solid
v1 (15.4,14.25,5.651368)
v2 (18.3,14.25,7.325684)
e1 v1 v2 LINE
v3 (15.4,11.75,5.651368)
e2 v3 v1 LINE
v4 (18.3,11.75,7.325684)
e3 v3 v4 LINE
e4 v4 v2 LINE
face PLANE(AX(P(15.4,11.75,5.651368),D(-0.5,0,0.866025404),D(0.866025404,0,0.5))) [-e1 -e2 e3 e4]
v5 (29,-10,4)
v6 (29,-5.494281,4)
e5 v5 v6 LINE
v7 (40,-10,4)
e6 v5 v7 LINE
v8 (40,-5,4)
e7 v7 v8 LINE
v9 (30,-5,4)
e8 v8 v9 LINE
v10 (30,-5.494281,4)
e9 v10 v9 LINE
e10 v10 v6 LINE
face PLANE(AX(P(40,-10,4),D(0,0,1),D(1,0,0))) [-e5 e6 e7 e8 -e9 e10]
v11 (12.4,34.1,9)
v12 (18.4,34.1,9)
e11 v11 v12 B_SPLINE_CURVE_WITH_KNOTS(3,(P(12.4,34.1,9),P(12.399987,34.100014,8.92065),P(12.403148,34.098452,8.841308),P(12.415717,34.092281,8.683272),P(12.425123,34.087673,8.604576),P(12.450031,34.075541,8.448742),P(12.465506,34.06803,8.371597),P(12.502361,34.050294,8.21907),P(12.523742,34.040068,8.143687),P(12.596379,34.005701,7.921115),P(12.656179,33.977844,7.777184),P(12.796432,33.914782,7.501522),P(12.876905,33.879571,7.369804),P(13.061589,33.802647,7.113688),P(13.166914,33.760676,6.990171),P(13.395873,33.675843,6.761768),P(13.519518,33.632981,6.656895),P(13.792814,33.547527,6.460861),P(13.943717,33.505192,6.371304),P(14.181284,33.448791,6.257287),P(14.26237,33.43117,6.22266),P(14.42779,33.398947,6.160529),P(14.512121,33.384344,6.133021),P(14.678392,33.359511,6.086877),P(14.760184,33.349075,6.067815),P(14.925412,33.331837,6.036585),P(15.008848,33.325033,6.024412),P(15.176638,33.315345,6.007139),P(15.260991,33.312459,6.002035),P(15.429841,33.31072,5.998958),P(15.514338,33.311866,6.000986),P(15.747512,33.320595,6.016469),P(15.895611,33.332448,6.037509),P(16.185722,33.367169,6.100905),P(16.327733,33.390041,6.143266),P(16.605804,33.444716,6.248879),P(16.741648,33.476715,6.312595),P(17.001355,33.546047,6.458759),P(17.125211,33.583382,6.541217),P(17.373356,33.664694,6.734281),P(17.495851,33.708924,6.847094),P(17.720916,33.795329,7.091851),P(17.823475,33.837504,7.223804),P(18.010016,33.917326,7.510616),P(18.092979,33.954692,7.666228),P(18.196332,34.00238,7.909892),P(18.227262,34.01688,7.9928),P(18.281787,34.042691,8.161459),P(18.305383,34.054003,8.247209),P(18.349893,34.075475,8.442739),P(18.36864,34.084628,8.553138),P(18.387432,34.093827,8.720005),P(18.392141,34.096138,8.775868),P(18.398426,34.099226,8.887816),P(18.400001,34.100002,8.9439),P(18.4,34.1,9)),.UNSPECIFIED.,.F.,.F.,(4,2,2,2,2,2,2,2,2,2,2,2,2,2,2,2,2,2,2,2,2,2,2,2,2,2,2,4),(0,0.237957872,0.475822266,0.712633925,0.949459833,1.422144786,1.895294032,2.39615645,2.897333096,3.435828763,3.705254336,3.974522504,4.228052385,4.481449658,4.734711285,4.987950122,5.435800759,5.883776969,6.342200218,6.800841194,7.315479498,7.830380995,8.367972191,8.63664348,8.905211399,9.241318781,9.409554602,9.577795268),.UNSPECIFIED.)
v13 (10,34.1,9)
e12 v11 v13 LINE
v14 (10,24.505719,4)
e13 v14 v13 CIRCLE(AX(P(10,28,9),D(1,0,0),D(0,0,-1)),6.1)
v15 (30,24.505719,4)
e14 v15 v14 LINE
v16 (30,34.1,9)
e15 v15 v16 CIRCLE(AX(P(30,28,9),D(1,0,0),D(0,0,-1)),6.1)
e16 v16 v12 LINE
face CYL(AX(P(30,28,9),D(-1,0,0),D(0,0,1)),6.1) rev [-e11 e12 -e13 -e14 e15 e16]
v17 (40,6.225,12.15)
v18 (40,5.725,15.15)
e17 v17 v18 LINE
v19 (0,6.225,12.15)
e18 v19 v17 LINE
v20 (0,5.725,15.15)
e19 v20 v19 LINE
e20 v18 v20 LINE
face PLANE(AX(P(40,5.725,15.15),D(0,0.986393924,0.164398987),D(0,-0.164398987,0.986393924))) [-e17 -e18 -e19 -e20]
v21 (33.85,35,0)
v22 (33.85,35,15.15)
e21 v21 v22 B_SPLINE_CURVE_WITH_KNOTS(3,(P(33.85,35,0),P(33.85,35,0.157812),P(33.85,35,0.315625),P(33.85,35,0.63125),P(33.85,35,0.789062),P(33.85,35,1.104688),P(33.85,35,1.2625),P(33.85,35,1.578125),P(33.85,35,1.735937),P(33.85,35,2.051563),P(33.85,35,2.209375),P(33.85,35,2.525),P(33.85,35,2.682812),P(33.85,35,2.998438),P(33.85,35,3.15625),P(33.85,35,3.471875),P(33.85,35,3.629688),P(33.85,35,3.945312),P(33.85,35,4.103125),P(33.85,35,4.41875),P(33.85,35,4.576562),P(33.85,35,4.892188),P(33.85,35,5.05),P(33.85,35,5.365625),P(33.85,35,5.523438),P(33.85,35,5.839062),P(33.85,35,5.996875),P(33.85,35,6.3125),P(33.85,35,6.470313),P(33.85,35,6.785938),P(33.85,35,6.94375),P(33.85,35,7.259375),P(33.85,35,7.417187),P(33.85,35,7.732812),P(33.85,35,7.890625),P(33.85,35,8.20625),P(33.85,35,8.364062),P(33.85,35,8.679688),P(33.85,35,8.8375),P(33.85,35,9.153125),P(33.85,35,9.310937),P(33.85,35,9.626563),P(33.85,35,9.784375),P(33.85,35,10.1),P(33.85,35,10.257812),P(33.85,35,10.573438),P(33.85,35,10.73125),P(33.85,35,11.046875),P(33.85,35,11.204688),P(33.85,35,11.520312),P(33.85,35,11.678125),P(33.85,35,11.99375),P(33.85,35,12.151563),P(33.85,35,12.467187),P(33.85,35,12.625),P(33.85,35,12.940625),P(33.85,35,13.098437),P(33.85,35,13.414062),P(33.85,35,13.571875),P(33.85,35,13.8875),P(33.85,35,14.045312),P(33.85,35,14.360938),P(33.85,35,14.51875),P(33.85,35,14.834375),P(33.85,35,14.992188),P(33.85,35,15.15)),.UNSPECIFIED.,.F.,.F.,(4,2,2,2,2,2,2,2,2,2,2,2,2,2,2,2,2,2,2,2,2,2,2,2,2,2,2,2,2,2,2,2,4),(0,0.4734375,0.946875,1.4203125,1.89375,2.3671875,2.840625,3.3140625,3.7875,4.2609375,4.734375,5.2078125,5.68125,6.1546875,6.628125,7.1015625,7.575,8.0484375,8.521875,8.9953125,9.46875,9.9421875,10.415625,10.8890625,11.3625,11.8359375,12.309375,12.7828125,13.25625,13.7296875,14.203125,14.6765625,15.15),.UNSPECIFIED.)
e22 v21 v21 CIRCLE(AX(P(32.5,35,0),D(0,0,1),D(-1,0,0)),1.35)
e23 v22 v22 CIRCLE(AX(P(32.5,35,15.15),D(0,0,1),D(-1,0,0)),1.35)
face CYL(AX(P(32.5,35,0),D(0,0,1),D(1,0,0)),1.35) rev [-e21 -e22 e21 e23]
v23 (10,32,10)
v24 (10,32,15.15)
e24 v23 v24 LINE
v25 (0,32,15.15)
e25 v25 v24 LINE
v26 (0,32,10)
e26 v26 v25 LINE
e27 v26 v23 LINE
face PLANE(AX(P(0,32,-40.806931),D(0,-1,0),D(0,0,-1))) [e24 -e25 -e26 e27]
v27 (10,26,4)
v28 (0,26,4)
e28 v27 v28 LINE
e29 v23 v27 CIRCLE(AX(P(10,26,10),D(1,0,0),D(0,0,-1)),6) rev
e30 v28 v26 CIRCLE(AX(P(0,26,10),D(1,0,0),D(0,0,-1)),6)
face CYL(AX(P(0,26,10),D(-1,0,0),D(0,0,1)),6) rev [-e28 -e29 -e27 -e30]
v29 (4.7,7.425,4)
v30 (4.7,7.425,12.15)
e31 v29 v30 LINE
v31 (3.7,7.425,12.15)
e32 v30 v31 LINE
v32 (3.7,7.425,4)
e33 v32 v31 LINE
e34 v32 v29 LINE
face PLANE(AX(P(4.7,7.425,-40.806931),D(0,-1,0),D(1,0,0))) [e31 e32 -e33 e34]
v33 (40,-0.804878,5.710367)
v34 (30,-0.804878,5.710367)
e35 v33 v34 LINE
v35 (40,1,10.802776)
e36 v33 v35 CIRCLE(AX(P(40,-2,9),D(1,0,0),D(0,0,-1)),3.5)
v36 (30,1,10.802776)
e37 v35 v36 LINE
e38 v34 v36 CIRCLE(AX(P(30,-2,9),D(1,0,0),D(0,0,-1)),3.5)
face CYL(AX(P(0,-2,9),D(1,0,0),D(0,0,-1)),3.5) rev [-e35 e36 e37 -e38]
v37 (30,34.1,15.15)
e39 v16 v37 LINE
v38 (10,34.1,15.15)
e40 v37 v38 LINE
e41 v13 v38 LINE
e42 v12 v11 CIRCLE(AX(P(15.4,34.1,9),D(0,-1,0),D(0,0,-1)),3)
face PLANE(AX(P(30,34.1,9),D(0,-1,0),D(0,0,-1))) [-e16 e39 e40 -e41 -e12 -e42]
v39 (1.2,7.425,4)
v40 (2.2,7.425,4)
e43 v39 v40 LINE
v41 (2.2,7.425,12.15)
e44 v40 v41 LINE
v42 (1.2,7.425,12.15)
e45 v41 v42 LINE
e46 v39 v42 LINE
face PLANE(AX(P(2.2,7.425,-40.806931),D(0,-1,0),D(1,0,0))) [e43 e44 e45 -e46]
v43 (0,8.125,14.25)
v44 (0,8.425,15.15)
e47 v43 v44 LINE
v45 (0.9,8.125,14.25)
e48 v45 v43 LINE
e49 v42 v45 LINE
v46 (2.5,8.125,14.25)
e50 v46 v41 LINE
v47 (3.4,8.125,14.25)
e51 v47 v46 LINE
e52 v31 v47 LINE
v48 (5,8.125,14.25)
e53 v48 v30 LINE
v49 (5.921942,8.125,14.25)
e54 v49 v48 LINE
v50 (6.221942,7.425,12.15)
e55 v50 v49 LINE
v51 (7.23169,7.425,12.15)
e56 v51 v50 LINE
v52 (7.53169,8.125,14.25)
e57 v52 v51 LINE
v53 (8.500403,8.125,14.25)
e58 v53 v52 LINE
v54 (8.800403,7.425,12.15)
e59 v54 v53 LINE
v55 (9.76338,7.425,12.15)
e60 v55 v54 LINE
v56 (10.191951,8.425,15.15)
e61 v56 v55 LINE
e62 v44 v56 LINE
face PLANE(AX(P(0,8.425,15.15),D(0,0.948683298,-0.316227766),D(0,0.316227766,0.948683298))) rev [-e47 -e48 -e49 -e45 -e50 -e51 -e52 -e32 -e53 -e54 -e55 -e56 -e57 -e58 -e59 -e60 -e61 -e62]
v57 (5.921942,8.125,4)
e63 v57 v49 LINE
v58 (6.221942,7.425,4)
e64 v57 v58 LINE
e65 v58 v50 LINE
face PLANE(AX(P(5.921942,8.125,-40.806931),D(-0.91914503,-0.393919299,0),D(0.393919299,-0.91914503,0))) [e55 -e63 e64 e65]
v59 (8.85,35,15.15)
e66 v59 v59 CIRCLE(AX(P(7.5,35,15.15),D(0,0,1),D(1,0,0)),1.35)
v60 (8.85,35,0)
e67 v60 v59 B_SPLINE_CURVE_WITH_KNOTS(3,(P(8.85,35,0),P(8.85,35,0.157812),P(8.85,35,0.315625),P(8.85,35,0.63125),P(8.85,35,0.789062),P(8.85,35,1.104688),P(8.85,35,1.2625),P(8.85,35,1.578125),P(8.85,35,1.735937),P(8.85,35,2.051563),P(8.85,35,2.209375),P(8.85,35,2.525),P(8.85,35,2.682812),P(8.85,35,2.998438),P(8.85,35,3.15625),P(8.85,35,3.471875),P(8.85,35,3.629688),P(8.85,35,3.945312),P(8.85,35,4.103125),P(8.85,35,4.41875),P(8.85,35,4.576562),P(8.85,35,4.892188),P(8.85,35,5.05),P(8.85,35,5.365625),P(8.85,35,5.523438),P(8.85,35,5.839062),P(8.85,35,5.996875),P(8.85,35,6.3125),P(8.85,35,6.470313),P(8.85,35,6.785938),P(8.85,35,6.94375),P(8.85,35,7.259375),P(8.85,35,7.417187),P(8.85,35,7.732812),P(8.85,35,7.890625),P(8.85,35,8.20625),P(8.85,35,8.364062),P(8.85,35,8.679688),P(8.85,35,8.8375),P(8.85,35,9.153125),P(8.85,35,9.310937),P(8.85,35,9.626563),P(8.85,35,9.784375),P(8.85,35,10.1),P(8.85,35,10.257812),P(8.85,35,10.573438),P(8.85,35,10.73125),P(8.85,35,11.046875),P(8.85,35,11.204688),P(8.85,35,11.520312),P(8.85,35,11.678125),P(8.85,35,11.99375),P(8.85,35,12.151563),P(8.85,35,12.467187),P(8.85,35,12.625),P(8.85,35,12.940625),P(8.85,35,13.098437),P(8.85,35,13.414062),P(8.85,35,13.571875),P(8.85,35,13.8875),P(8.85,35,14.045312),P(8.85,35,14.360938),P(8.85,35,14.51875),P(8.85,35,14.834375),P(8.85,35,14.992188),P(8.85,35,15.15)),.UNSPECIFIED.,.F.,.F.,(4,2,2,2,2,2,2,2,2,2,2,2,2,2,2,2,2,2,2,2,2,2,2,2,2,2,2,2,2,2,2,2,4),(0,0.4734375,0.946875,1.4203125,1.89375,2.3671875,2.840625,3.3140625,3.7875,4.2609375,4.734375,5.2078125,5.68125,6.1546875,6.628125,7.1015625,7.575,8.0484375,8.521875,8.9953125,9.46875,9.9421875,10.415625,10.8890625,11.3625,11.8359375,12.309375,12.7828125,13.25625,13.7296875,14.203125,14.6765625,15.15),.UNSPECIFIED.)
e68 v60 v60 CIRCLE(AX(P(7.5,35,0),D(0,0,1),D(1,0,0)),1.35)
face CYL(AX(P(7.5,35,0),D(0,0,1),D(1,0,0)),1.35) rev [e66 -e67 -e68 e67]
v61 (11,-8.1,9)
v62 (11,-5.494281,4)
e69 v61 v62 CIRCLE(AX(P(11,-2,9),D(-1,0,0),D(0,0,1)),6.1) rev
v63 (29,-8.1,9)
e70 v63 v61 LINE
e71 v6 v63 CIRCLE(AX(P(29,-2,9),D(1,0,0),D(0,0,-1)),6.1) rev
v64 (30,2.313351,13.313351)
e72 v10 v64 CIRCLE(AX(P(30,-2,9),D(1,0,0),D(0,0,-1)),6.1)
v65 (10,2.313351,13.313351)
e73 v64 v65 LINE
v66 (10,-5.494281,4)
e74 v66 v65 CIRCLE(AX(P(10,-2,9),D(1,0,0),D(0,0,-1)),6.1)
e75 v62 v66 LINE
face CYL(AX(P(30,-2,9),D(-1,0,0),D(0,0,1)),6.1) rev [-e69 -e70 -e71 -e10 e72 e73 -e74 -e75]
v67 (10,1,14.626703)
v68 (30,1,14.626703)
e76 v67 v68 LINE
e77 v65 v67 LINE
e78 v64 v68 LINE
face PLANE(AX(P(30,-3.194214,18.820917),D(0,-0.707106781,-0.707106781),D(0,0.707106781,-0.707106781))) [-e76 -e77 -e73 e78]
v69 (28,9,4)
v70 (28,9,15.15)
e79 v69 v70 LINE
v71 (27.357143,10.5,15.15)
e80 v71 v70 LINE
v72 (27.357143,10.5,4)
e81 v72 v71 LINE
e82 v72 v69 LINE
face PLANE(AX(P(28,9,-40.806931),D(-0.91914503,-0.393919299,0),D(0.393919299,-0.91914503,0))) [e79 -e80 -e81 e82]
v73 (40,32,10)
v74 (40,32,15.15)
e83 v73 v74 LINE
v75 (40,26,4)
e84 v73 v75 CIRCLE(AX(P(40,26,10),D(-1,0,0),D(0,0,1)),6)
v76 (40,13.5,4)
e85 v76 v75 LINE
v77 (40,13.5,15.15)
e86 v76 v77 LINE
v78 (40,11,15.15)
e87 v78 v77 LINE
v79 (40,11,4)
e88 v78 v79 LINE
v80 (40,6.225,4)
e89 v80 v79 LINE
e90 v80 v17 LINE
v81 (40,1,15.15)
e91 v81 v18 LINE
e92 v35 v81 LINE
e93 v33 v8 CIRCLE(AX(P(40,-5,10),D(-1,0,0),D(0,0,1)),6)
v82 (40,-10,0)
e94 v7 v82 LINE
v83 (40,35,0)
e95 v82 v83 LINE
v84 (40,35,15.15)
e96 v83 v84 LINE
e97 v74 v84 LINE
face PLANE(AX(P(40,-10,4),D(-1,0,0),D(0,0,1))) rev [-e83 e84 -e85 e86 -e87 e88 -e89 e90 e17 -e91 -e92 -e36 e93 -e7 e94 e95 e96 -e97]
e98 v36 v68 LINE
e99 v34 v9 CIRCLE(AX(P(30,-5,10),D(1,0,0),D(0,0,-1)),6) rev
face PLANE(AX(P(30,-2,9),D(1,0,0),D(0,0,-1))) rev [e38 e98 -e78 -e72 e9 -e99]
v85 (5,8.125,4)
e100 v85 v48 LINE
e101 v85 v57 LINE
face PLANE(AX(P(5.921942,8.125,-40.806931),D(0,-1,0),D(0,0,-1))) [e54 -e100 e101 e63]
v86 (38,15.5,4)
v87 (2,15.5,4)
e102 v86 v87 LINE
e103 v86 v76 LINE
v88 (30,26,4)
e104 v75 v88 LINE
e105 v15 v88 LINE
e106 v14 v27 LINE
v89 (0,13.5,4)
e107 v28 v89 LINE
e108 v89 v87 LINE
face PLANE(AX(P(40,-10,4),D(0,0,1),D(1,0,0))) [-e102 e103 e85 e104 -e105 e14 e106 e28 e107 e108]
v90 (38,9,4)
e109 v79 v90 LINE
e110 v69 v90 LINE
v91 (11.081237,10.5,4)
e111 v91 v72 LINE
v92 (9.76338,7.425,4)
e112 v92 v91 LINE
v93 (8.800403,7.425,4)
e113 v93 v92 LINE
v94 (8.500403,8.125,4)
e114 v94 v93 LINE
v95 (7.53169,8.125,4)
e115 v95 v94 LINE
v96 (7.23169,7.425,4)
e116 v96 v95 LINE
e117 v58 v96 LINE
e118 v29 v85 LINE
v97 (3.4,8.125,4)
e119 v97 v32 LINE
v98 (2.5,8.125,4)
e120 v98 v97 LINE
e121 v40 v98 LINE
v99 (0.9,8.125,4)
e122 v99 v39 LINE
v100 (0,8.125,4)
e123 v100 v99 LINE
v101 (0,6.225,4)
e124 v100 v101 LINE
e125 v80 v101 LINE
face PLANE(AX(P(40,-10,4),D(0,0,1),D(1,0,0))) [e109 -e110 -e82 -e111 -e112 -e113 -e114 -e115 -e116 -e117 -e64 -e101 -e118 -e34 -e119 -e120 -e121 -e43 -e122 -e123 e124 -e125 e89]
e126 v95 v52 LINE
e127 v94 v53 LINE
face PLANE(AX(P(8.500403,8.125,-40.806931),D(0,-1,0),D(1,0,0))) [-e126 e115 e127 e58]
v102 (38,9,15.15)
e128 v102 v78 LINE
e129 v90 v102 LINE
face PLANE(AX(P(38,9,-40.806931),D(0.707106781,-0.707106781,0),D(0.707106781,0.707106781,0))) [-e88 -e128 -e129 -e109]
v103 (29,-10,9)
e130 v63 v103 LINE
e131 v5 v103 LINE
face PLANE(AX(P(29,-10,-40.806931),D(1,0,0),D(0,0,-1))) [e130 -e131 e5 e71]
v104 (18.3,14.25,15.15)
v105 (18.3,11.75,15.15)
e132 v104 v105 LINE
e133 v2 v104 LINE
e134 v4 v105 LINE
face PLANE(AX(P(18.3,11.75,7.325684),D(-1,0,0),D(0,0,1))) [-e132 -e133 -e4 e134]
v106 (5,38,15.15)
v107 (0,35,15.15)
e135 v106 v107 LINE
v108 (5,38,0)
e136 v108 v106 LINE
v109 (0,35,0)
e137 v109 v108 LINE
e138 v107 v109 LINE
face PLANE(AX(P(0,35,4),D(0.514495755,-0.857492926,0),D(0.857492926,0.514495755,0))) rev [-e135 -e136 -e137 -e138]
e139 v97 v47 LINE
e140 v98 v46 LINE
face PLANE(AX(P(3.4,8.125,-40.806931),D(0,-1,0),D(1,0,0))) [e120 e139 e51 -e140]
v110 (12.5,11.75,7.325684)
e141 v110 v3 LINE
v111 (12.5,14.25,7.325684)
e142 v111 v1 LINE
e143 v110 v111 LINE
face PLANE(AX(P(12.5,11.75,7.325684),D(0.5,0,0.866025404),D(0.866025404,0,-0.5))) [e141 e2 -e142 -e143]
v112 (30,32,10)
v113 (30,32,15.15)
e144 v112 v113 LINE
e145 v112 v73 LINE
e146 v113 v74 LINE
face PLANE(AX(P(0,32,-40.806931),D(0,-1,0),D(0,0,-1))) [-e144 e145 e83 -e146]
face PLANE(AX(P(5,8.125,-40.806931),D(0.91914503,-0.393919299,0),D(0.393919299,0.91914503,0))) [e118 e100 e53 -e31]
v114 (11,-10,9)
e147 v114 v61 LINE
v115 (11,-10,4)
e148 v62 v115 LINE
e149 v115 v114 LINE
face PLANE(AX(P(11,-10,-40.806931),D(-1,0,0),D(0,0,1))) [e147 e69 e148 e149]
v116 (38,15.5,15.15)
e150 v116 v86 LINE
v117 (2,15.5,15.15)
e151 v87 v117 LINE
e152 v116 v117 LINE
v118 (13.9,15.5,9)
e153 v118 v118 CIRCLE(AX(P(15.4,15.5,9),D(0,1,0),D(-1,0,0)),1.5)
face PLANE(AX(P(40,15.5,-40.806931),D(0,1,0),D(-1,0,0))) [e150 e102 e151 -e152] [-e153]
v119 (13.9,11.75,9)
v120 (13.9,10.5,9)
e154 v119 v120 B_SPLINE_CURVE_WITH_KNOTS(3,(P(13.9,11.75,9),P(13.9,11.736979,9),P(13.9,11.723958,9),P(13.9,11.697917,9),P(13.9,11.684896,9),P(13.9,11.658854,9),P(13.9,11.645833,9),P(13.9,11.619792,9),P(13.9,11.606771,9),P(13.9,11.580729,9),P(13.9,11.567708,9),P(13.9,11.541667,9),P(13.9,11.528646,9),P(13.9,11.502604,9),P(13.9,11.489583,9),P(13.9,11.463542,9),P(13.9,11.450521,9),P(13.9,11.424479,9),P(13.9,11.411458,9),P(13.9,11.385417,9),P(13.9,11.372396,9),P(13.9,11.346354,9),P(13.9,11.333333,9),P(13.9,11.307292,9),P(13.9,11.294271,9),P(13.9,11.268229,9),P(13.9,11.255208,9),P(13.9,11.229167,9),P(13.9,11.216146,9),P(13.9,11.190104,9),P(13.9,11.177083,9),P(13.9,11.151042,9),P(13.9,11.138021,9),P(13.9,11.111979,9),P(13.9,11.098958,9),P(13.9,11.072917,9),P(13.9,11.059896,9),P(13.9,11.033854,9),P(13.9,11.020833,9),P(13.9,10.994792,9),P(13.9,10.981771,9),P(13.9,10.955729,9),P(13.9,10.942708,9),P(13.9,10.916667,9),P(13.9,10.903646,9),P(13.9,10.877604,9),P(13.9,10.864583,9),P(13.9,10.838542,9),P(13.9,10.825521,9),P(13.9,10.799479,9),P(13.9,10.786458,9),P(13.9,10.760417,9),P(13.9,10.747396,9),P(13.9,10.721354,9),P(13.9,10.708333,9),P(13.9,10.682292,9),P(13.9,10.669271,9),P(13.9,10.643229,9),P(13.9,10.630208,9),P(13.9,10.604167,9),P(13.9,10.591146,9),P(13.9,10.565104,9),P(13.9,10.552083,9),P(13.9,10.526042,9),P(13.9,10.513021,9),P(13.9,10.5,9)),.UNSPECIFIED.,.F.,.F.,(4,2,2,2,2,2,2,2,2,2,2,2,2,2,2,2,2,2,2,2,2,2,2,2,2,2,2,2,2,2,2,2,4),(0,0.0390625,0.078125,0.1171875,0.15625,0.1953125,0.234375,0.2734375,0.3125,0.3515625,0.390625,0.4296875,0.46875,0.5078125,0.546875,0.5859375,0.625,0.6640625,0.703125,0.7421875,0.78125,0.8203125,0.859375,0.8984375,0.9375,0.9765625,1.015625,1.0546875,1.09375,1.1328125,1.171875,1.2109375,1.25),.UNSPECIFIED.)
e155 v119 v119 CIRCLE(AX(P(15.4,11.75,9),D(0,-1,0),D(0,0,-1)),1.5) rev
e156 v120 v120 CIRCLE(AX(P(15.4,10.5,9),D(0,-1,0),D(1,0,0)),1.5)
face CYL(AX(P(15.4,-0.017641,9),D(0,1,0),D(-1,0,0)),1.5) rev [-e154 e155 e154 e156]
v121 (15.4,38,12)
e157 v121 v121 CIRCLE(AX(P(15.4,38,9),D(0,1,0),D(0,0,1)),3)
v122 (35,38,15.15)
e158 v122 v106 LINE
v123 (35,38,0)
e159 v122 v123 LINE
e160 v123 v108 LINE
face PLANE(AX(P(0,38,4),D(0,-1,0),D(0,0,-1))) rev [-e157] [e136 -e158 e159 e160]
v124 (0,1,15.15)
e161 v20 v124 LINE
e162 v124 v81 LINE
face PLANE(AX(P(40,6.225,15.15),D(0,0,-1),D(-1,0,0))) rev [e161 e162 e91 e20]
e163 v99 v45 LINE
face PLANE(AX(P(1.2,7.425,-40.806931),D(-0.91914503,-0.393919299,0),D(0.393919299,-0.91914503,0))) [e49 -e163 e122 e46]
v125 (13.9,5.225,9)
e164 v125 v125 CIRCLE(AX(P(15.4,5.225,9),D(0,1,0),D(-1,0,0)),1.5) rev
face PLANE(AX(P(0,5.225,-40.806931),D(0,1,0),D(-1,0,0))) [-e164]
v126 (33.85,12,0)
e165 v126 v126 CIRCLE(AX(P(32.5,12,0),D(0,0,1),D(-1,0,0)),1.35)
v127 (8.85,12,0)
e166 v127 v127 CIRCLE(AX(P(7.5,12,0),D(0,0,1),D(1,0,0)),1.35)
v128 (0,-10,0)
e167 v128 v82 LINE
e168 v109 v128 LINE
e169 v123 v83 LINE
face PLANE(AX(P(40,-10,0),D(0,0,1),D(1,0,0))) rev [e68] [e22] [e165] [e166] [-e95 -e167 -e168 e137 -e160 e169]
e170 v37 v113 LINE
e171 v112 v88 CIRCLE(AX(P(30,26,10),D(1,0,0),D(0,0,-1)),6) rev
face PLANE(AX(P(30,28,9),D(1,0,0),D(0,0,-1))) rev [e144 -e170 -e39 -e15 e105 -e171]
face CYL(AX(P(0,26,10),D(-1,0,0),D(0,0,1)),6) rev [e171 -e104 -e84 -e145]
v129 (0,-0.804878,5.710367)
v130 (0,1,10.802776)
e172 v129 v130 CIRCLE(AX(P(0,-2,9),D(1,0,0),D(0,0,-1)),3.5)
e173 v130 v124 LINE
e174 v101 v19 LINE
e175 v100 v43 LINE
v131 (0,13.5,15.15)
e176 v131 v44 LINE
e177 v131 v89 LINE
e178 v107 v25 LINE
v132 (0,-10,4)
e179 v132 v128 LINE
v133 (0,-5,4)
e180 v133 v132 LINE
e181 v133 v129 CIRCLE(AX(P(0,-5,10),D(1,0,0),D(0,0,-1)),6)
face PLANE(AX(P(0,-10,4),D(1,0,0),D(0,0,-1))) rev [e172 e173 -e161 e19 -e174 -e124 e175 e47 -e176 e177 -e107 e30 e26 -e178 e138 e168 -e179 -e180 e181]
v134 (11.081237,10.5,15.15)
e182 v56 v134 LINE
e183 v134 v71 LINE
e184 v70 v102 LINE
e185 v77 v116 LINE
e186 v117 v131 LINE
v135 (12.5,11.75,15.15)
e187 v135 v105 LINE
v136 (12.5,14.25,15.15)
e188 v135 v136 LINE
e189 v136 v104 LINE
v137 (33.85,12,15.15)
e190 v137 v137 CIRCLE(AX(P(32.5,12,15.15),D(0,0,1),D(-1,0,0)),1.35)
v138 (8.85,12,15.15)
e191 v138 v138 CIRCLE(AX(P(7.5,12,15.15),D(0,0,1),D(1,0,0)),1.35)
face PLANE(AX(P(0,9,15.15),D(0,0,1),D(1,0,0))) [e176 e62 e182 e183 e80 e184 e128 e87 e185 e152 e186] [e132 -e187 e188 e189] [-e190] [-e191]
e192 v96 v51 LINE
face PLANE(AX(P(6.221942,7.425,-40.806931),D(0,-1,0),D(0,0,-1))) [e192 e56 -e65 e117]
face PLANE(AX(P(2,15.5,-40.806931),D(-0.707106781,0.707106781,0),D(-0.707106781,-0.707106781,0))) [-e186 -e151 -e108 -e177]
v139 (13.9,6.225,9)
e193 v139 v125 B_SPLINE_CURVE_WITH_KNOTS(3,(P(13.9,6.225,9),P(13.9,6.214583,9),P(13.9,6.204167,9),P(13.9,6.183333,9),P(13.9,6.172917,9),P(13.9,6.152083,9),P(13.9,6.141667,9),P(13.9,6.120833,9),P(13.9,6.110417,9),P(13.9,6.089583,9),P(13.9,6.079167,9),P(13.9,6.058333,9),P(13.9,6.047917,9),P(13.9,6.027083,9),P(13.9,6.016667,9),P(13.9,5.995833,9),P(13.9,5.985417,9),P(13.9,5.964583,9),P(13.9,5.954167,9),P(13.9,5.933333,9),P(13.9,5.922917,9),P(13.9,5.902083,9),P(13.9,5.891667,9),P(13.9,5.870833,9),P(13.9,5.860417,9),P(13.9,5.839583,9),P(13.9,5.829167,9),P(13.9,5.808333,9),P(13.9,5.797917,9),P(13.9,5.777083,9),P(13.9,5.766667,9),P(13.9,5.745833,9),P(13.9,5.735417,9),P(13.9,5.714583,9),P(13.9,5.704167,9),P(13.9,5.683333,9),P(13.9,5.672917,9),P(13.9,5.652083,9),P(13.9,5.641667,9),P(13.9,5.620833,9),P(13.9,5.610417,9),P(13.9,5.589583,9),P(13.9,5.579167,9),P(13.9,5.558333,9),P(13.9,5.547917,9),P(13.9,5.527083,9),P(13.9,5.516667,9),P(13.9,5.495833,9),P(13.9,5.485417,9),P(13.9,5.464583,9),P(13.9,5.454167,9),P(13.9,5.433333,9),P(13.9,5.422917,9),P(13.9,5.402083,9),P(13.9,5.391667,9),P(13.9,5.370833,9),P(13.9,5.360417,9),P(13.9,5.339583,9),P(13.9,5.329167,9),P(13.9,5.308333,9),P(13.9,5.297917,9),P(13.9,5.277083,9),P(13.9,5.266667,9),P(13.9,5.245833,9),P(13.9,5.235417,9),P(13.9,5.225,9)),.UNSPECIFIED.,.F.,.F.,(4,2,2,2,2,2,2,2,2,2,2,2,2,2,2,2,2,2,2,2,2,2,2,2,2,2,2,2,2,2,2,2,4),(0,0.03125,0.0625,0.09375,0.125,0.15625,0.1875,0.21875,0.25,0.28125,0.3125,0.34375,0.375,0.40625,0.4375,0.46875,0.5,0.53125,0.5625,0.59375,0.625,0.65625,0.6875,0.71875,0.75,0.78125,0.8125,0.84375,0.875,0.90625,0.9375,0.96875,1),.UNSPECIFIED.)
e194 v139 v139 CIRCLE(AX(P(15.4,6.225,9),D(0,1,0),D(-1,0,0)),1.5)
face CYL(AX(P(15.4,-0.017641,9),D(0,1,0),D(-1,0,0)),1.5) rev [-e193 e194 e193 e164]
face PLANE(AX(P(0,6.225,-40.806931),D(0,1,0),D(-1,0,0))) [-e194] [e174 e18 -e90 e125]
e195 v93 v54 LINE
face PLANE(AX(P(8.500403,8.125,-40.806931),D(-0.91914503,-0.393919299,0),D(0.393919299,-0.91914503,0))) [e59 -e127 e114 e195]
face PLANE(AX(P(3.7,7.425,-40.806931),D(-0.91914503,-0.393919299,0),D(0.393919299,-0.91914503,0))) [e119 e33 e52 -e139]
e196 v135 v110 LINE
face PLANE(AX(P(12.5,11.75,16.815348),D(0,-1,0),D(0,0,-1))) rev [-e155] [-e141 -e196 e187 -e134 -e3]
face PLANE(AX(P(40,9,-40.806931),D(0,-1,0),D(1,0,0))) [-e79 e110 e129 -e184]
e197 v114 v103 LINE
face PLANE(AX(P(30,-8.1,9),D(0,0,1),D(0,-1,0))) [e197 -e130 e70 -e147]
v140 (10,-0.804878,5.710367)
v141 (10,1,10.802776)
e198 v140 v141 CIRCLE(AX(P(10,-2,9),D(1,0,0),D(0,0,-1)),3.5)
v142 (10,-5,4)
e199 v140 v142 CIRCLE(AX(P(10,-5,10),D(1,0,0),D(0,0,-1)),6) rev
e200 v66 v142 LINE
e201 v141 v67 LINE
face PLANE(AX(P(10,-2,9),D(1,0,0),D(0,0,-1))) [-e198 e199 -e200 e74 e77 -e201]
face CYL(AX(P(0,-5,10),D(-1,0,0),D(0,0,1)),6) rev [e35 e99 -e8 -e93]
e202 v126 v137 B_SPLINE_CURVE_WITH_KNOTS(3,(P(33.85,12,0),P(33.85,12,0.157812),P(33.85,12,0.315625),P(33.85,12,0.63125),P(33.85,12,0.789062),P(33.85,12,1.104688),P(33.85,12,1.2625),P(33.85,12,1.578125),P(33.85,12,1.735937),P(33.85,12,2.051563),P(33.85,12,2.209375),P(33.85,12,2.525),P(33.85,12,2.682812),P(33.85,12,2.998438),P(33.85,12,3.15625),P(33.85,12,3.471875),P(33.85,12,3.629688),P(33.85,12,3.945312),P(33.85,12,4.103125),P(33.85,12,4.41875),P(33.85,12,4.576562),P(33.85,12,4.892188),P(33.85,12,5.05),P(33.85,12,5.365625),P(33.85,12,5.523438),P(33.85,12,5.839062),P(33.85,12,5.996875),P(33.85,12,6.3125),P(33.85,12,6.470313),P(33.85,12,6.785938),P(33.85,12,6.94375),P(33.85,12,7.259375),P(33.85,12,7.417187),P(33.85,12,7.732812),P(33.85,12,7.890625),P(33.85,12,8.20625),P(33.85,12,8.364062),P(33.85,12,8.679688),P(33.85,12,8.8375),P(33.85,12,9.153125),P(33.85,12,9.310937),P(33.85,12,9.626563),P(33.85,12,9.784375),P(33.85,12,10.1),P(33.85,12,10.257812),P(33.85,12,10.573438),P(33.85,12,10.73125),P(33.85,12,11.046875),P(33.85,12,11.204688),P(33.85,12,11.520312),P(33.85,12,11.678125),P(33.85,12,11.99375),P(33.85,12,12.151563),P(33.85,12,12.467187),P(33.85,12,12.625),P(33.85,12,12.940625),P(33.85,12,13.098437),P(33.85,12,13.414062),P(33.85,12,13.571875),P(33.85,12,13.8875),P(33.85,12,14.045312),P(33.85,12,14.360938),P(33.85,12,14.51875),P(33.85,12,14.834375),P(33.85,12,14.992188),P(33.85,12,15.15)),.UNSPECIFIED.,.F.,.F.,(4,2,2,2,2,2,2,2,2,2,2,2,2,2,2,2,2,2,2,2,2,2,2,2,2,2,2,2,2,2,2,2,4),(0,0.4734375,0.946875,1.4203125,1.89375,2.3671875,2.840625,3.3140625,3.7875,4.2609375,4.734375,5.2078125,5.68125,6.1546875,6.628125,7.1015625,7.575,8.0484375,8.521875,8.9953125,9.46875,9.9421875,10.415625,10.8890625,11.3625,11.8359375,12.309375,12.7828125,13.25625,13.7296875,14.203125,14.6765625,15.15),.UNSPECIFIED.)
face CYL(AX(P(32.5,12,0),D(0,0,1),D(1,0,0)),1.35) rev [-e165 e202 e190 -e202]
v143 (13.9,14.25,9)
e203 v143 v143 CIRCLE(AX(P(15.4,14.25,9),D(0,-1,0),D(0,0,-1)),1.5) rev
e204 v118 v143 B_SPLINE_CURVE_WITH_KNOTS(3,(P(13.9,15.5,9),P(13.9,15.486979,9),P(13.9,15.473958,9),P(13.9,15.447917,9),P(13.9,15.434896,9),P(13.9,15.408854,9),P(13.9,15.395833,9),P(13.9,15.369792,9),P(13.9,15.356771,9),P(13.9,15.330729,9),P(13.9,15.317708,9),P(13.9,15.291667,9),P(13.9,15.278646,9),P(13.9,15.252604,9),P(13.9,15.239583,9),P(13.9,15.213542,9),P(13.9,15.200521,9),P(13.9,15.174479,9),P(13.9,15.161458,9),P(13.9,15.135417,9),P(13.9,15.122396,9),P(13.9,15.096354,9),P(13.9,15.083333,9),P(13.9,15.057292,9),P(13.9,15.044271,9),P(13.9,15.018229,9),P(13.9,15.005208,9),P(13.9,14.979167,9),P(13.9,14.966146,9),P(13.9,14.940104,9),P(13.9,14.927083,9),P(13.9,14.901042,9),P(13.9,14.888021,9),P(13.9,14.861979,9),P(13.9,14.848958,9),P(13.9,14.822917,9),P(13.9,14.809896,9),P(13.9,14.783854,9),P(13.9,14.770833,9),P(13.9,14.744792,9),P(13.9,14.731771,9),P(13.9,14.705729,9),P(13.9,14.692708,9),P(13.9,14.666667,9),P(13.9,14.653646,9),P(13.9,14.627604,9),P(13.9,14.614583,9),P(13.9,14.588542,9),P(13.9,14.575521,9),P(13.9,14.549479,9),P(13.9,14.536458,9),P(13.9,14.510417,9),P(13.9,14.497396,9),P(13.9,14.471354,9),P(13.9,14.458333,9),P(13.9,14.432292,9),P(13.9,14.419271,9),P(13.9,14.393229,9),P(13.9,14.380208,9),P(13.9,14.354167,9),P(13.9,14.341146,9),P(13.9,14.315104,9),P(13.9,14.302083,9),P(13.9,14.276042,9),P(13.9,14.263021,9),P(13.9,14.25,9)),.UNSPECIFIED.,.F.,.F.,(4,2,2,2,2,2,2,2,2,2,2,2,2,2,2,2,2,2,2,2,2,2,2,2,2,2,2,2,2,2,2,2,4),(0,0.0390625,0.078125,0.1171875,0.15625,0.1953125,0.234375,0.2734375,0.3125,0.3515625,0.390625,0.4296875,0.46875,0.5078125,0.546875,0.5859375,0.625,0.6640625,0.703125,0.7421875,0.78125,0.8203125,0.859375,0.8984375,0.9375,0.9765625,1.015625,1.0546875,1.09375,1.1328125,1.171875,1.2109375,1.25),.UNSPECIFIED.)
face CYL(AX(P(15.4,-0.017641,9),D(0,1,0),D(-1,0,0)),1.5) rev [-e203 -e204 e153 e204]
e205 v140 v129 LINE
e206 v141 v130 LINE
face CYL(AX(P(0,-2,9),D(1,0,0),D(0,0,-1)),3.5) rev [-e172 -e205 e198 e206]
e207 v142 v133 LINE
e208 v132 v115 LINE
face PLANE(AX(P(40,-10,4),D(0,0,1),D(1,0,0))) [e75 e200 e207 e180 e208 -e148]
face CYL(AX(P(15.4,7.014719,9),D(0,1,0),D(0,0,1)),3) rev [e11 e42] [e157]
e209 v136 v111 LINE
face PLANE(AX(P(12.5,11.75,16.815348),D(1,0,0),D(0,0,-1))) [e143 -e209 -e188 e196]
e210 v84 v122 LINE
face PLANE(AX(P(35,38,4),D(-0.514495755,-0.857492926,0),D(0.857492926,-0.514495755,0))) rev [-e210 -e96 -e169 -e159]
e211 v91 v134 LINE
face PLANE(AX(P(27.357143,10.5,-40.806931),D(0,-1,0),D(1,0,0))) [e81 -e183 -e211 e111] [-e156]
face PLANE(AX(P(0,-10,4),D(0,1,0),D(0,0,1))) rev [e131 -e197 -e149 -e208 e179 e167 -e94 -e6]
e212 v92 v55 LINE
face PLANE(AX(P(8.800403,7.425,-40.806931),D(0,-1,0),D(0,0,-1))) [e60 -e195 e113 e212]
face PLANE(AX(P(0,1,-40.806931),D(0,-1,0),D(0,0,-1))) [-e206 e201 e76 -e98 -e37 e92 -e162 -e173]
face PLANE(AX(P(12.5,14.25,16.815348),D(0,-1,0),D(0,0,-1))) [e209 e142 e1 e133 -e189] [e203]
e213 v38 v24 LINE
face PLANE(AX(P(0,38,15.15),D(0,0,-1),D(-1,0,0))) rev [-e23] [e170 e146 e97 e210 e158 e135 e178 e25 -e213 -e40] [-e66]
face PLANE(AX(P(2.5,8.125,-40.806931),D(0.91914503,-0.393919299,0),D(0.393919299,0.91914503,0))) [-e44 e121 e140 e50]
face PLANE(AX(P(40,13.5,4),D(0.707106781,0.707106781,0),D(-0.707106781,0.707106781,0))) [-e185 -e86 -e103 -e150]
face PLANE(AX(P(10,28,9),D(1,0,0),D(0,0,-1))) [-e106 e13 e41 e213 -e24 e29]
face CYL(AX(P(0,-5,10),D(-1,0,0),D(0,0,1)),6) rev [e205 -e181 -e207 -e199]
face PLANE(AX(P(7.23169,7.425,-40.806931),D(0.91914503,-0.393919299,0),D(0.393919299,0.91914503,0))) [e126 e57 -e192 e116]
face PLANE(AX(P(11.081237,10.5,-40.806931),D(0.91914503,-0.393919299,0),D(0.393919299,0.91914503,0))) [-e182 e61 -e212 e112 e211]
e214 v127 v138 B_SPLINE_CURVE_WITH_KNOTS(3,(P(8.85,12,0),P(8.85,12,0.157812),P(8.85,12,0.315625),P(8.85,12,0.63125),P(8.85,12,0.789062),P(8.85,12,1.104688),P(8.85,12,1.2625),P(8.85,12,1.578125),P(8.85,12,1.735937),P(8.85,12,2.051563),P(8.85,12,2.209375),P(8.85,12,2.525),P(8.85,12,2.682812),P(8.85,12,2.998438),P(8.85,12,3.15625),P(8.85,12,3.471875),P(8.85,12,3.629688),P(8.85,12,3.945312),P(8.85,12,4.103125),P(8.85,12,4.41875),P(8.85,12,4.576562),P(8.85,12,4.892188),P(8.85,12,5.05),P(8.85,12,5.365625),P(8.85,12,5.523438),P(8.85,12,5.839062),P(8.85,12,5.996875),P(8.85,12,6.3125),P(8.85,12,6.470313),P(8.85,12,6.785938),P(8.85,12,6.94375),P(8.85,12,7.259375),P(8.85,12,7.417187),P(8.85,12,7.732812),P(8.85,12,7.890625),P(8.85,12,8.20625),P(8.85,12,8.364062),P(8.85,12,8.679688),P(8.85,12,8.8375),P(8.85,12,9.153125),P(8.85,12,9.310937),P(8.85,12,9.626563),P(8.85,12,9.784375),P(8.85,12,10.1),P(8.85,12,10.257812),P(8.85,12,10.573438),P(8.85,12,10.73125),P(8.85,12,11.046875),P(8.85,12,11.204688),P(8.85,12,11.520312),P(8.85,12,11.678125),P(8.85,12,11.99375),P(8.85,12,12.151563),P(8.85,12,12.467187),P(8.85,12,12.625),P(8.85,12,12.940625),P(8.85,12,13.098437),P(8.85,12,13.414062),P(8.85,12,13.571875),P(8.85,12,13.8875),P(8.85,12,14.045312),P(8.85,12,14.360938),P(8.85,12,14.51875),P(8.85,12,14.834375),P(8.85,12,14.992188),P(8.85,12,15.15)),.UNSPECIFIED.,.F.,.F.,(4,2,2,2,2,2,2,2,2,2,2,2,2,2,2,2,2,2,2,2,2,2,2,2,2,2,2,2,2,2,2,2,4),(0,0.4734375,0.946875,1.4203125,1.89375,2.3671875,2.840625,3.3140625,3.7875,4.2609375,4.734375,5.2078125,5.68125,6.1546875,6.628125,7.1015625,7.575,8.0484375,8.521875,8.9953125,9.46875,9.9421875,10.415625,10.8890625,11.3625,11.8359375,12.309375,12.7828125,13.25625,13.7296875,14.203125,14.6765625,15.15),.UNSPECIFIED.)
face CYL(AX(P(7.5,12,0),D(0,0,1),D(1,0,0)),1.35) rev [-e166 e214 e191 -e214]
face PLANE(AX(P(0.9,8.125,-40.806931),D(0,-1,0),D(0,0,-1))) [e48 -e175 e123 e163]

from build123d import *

# Parameters (mm, degrees)
SKETCH1_W                = 40
SKETCH1_H                = 48
BOSS_EXTRUDE1_DEPTH      = 4
BOSS_EXTRUDE2_DEPTH      = 11.15
BOSS_EXTRUDE2_DEPTH_BACK = 4
SKETCH5_W                = 40
SKETCH5_H                = 5.225
SKETCH5_W_2              = 18
SKETCH5_H_2              = 5
SKETCH5_H_3              = 6
FILLET1_DEPTH            = 40
SKETCH6_R                = 1.35
CUT_EXTRUDE4_DEPTH       = 58.214705278
CHAMFER2_SIZE            = 2
CHAMFER3_SIZE            = 3
CHAMFER3_SIZE2           = 1
CHAMFER4_SIZE            = 3
CHAMFER4_SIZE2           = 0.5
CUT_EXTRUDE6_DEPTH       = 10
CUT_EXTRUDE6_DEPTH_BACK  = 10
CUT_EXTRUDE8_REACH       = 66.292
SKETCH12_R               = 3
SKETCH13_R               = 1.5
CUT_EXTRUDE10_DEPTH      = 10.275
CUT_EXTRUDE7_DEPTH       = 1.25
CUT_EXTRUDE7_DEPTH_BACK  = 1.25
CHAMFER5_SIZE            = 5
CHAMFER5_SIZE2           = 3
CHAMFER6_SIZE            = 3
CHAMFER6_SIZE2           = 5
CUT_EXTRUDE12_DEPTH      = 46.535947422
CUT_EXTRUDE12_DEPTH_BACK = 46.535947422
SKETCH15_R               = 3.5


with BuildPart() as part:
    # Sketch1 → Boss-Extrude1 (new body)
    with BuildSketch(Plane.XY):
        with Locations((20, 14)):
            Rectangle(SKETCH1_W, SKETCH1_H)
    extrude(amount=BOSS_EXTRUDE1_DEPTH)

    # Sketch5 → Boss-Extrude2 (add, two sides: drawn at the far end of the back side and taken through both)
    with BuildSketch(Plane.XY.offset(4).offset(-BOSS_EXTRUDE2_DEPTH_BACK)):
        Polygon((0.9, 8.125), (0, 8.125), (0, 15.5), (40, 15.5), (40, 9), (28, 9), (27.357142857, 10.5), (11.081237185, 10.5), (9.763380042, 7.425), (8.800403155, 7.425), (8.500403155, 8.125), (7.531690021, 8.125), (7.231690021, 7.425), (6.221941609, 7.425), (5.921941609, 8.125), (5, 8.125), (4.7, 7.425), (3.7, 7.425), (3.4, 8.125), (2.5, 8.125), (2.2, 7.425), (1.2, 7.425), align=None)
        with Locations((20, 3.6125)):
            Rectangle(SKETCH5_W, SKETCH5_H)
        with Locations((20, -7.5)):
            Rectangle(SKETCH5_W_2, SKETCH5_H_2)
        with Locations((20, 35)):
            Rectangle(SKETCH5_W, SKETCH5_H_3)
    extrude(amount=BOSS_EXTRUDE2_DEPTH + BOSS_EXTRUDE2_DEPTH_BACK)

    # Fillet1: read off the stored shape, not the designer's step
    # Fillet1 outline → Fillet1 (add)
    with BuildSketch(Plane.YZ):
        with BuildLine():
            Line((32, 4), (32, 10))
            ThreePointArc((32, 10), (30.242640687, 5.757359313), (26, 4))
            Line((26, 4), (32, 4))
        make_face()
        with BuildLine():
            Line((1, 4), (1, 10))
            ThreePointArc((1, 10), (-0.757359313, 5.757359313), (-5, 4))
            Line((-5, 4), (1, 4))
        make_face()
    extrude(amount=FILLET1_DEPTH)

    # Sketch6 → Cut-Extrude4 (cut, through all)
    with BuildSketch(Plane.XY.offset(15.15)):
        with Locations((7.5, 35)):
            Circle(SKETCH6_R)
        with Locations((7.5, 12)):
            Circle(SKETCH6_R)
        with Locations((32.5, 35)):
            Circle(SKETCH6_R)
        with Locations((32.5, 12)):
            Circle(SKETCH6_R)
    extrude(amount=-CUT_EXTRUDE4_DEPTH, mode=Mode.SUBTRACT)

    # Chamfer2
    chamfer2_edges = [part.edges().sort_by_distance(p)[0] for p in [
        (40, 9, 9.575),
        (0, 15.5, 9.575),
        (40, 15.5, 9.575),
    ]]
    chamfer(chamfer2_edges, length=CHAMFER2_SIZE)

    # Chamfer3
    chamfer3_edges = [part.edges().sort_by_distance(p)[0] for p in [
        (4.2, 7.425, 15.15),
    ]]
    chamfer3_side = [part.faces().sort_by_distance(p)[0] for p in [
        (4.2, 7.425, 9.575),
    ]]
    chamfer(chamfer3_edges, length=CHAMFER3_SIZE, length2=CHAMFER3_SIZE2, reference=chamfer3_side[0])

    # Chamfer4
    chamfer4_edges = [part.edges().sort_by_distance(p)[0] for p in [
        (20, 6.225, 15.15),
    ]]
    chamfer4_side = [part.faces().sort_by_distance(p)[0] for p in [
        (20, 6.225, 9.575),
    ]]
    chamfer(chamfer4_edges, length=CHAMFER4_SIZE, length2=CHAMFER4_SIZE2, reference=chamfer4_side[0])

    # Sketch8 → Cut-Extrude6 (cut, two sides: drawn at the far end of the back side and taken through both)
    with BuildSketch(Plane(origin=(20, 0, 0), x_dir=(0, 0, -1), z_dir=(1, 0, 0)).offset(-CUT_EXTRUDE6_DEPTH_BACK)):
        with BuildLine():
            Line((-9, 34.1), (-18.820916768, 34.1))
            Line((-18.820916768, 34.1), (-18.820916768, 21.9))
            Line((-18.820916768, 21.9), (-9, 21.9))
            ThreePointArc((-9, 21.9), (-2.9, 28), (-9, 34.1))
        make_face()
        with BuildLine():
            Line((-18.820916768, -10.472551988), (-18.820916768, -3.194214037))
            Line((-18.820916768, -3.194214037), (-13.313351365, 2.313351365))
            ThreePointArc((-13.313351365, 2.313351365), (-3.364334852, 0.334368937), (-9, -8.1))
            Line((-9, -8.1), (-9, -10.472551988))
            Line((-9, -10.472551988), (-18.820916768, -10.472551988))
        make_face()
    extrude(amount=CUT_EXTRUDE6_DEPTH + CUT_EXTRUDE6_DEPTH_BACK, mode=Mode.SUBTRACT)

    # Cut-Extrude8: up to this face of the body (flat: up to its plane)
    cut_extrude8_end = Plane(part.part.faces().sort_by_distance((20, 15.5, 9.575))[0])
    # Sketch12 → Cut-Extrude8 (cut, up to the picked face)
    with BuildSketch(Plane(origin=(0, 38, 0), x_dir=(1, 0, 0), z_dir=(0, 1, 0)), mode=Mode.PRIVATE) as cut_extrude8_sk1:
        with Locations(Location((15.4, -9, 0), (0, 0, 270))):
            Circle(SKETCH12_R)
    cut_extrude8_tool1 = split(extrude(cut_extrude8_sk1.sketch, amount=-CUT_EXTRUDE8_REACH, mode=Mode.PRIVATE), bisect_by=cut_extrude8_end, keep=Keep.BOTH, mode=Mode.PRIVATE)
    add(cut_extrude8_tool1.solids().sort_by(Axis((15.4, 38, 9), (0, -1, 0)))[0], mode=Mode.SUBTRACT)

    # Sketch13 → Cut-Extrude10 (cut)
    with BuildSketch(Plane(origin=(0, 15.5, 0), x_dir=(1, 0, 0), z_dir=(0, 1, 0))):
        with Locations(Location((15.4, -9, 0), (0, 0, 180))):
            Circle(SKETCH13_R)
    extrude(amount=-CUT_EXTRUDE10_DEPTH, mode=Mode.SUBTRACT)

    # Sketch9 → Cut-Extrude7 (cut, two sides: drawn at the far end of the back side and taken through both)
    with BuildSketch(Plane.XZ.offset(-13).offset(-CUT_EXTRUDE7_DEPTH_BACK)):
        Polygon((12.5, 16.815347994), (18.3, 16.815347994), (18.3, 7.325684219), (15.4, 5.651368439), (12.5, 7.325684219), align=None)
    extrude(amount=CUT_EXTRUDE7_DEPTH + CUT_EXTRUDE7_DEPTH_BACK, mode=Mode.SUBTRACT)

    # Chamfer5
    chamfer5_edges = [part.edges().sort_by_distance(p)[0] for p in [
        (0, 38, 7.575),
    ]]
    chamfer5_side = [part.faces().sort_by_distance(p)[0] for p in [
        (20.225127502, 38, 7.505259415),
    ]]
    chamfer(chamfer5_edges, length=CHAMFER5_SIZE, length2=CHAMFER5_SIZE2, reference=chamfer5_side[0])

    # Chamfer6
    chamfer6_edges = [part.edges().sort_by_distance(p)[0] for p in [
        (40, 38, 7.575),
    ]]
    chamfer6_side = [part.faces().sort_by_distance(p)[0] for p in [
        (40, 5.721658913, 8.075),
    ]]
    chamfer(chamfer6_edges, length=CHAMFER6_SIZE, length2=CHAMFER6_SIZE2, reference=chamfer6_side[0])

    # Sketch15 → Cut-Extrude12 (cut, two sides: drawn at the far end of the back side and taken through both)
    with BuildSketch(Plane(origin=(20, 0, 0), x_dir=(0, 0, -1), z_dir=(1, 0, 0)).offset(-CUT_EXTRUDE12_DEPTH_BACK)):
        with Locations((-9, -2)):
            Circle(SKETCH15_R)
    extrude(amount=CUT_EXTRUDE12_DEPTH + CUT_EXTRUDE12_DEPTH_BACK, mode=Mode.SUBTRACT)


solid = part.part
